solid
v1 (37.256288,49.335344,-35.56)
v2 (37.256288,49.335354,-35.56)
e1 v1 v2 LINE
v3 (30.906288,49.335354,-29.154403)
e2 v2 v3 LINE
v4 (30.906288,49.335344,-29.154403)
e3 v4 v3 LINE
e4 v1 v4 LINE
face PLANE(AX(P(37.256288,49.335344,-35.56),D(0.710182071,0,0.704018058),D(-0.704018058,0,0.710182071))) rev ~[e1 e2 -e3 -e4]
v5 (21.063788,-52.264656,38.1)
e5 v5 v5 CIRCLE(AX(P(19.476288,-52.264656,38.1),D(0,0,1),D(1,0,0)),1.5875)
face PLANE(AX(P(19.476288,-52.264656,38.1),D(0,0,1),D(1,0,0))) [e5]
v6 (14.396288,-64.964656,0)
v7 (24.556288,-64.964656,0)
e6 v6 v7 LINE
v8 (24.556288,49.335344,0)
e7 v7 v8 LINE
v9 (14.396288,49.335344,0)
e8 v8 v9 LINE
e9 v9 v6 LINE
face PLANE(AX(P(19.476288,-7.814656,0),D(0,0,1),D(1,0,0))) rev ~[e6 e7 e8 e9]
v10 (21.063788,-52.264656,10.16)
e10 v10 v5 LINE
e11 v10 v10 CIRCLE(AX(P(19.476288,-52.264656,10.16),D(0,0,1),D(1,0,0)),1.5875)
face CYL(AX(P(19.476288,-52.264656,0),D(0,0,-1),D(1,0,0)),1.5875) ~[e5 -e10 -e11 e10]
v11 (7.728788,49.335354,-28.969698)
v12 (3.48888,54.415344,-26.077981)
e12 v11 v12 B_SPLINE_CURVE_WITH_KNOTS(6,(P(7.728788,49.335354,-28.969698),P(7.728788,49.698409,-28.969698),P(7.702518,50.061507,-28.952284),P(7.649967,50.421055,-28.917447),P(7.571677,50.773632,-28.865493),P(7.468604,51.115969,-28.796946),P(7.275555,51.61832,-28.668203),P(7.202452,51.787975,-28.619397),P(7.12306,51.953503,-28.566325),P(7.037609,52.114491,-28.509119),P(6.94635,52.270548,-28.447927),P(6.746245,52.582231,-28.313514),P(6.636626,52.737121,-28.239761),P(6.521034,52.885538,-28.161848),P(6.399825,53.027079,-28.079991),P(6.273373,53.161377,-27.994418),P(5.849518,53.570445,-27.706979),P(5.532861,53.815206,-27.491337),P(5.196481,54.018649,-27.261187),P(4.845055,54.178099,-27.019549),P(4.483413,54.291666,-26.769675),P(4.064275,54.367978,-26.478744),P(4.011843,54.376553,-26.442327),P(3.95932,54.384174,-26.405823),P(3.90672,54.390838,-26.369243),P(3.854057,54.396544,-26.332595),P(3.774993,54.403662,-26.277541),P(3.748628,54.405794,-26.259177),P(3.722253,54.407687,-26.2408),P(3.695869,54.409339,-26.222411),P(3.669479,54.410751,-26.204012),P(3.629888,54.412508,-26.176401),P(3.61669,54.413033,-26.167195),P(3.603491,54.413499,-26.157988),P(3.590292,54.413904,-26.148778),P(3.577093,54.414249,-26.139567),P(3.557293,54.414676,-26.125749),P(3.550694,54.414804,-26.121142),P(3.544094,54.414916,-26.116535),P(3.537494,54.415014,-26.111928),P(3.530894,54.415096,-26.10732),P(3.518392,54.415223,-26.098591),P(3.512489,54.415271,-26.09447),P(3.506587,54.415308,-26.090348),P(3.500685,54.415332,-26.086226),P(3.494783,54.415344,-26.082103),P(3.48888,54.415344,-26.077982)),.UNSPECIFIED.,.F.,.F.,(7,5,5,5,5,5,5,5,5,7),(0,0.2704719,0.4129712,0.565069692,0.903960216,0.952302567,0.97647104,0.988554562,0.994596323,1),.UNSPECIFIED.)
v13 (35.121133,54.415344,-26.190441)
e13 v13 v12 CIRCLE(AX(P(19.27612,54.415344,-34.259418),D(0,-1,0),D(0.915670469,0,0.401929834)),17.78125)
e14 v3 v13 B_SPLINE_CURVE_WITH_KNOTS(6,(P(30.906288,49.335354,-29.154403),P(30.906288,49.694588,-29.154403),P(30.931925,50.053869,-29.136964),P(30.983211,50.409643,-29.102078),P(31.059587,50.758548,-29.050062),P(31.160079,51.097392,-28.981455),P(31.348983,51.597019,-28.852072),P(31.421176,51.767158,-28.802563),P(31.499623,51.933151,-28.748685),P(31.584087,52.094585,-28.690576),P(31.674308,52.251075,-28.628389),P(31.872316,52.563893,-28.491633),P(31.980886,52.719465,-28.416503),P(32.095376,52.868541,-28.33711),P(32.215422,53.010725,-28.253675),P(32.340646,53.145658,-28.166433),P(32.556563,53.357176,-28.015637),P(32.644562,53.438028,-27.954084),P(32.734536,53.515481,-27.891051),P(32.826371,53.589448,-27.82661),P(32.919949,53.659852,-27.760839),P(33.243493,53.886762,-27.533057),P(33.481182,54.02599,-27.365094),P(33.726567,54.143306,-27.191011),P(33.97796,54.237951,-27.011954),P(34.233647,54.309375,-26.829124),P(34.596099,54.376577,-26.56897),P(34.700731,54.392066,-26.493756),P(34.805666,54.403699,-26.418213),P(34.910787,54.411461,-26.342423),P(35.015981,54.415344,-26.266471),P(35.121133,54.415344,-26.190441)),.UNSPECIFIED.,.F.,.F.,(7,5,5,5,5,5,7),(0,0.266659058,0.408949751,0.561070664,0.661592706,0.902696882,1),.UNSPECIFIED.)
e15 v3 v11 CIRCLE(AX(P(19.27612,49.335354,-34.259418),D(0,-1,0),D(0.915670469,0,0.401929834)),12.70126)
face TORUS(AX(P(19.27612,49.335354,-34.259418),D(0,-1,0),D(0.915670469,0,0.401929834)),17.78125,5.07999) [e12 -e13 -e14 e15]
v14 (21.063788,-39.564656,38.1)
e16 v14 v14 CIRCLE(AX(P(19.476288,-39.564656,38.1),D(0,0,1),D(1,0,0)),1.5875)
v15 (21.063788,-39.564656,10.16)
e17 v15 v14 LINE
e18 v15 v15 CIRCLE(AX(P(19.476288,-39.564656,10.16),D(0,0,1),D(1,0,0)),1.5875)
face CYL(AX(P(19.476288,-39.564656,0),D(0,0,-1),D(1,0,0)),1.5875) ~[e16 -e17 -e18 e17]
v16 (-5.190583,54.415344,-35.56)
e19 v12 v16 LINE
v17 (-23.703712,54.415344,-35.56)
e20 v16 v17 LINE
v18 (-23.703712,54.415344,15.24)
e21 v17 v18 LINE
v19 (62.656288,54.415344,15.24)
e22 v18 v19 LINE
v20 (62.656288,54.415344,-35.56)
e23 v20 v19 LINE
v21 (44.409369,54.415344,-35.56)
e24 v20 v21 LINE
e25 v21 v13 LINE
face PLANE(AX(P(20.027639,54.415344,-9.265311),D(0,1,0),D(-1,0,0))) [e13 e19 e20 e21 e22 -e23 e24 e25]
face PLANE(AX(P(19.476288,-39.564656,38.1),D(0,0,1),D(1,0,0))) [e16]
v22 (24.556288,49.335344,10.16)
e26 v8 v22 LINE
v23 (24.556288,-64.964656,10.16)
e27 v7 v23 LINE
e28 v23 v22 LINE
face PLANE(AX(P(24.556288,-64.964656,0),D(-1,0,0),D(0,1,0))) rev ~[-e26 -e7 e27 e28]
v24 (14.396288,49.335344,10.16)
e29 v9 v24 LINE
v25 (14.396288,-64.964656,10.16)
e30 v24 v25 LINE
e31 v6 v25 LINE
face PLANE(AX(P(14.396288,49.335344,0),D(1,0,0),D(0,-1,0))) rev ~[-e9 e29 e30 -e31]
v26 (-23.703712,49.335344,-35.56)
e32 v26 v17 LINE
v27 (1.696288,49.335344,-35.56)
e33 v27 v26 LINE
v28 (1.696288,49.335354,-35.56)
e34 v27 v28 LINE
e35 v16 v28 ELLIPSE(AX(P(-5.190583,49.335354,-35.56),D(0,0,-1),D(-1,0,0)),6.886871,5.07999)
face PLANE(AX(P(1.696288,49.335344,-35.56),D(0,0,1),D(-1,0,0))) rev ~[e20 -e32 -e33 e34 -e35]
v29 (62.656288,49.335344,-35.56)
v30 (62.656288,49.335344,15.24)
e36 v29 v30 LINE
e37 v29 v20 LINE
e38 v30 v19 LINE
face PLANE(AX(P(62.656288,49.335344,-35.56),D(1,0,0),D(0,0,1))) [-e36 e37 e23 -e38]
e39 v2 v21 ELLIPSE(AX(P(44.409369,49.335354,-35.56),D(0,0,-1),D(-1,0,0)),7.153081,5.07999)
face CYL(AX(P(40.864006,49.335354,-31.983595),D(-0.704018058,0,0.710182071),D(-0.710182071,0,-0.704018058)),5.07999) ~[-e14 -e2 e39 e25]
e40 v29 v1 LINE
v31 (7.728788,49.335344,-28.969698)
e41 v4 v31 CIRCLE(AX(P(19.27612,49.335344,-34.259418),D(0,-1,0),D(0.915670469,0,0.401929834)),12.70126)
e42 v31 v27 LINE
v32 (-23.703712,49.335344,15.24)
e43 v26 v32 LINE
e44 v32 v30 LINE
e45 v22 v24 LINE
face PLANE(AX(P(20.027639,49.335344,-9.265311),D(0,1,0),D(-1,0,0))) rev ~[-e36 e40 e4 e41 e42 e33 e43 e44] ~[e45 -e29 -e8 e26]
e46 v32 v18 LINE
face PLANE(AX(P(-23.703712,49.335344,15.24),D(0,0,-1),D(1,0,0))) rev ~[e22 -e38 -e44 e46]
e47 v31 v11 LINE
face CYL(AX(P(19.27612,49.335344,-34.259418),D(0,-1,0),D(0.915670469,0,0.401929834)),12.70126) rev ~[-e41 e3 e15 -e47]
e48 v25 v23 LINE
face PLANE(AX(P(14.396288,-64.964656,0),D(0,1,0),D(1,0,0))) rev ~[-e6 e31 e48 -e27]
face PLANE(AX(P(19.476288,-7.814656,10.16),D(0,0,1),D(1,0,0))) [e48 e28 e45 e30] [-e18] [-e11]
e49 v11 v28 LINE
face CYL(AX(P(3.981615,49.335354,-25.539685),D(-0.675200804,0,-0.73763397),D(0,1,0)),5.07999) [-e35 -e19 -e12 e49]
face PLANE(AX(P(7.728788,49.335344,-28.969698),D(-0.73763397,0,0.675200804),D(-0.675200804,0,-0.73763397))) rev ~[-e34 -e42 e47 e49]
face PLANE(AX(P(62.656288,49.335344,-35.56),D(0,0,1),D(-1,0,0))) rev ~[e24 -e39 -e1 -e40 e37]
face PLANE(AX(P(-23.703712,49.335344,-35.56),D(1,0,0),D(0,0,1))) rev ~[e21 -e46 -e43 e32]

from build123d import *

# Parameters (mm, degrees)
F0_R     = 1.5875
F1_DEPTH = 10.16
F2_DEPTH = 38.1
F3_W     = 10.16
F3_H     = 10.16
F3_W_2   = 25.4
F3_H_2   = 50.8
F4_DEPTH = 5.08
F5_DEPTH = 3.81
F6_R     = 5.07999


# Not quite as in the source:
# - a fillet or chamfer is up to 0.001 mm smaller than in the source, because OpenCascade refuses the exact size
# - a feature names something its author has since deleted; it is built from what else it names


with BuildPart() as f1:
    # F0 (on Top) → F1 (new body)
    with BuildSketch(Plane.XY):
        Polygon((24.5562880617, 49.3353436351), (14.3962880617, 49.3353436351), (14.3962880617, -7.8146563649), (14.3962880617, -39.5646563649), (14.3962880617, -64.9646563649), (24.5562880617, -64.9646563649), align=None)
        with Locations((19.4762880617, -39.5646563649)):
            Circle(F0_R, mode=Mode.SUBTRACT)
        with Locations((19.4762880617, -52.2646563649)):
            Circle(F0_R, mode=Mode.SUBTRACT)
    extrude(amount=F1_DEPTH)

    # F0 (on Top) → F2 (join)
    with BuildSketch(Plane.XY):
        with Locations((19.4762880617, -39.5646563649)):
            Circle(F0_R)
        with Locations((19.4762880617, -52.2646563649)):
            Circle(F0_R)
    extrude(amount=F2_DEPTH)

    # F3 (on face) → F4 (join)
    with BuildSketch(Plane(origin=(0, 49.3353436351, 0), x_dir=(-1, 0, 0), z_dir=(0, 1, 0))):
        with BuildLine():
            Line((-24.5562880617, 0), (-24.5562880617, 10.16))
            Line((-24.5562880617, 10.16), (-24.5562880617, 15.24))
            Line((-24.5562880617, 15.24), (-37.2562880617, 15.24))
            Line((-37.2562880617, 15.24), (-37.2562880617, -35.56))
            Line((-37.2562880617, -35.56), (-30.9062880617, -29.15440273))
            ThreePointArc((-30.9062880617, -29.15440273), (-19.3773342754, -21.5585615124), (-7.7287880617, -28.9696984238))
            Line((-7.7287880617, -28.9696984238), (-1.6962880617, -35.56))
            Line((-1.6962880617, -35.56), (-1.6962880617, 10.16))
            Line((-1.6962880617, 10.16), (-14.3962880617, 10.16))
            Line((-14.3962880617, 10.16), (-14.3962880617, 0))
            Line((-14.3962880617, 0), (-24.5562880617, 0))
        make_face()
        Polygon((-24.5562880617, 15.24), (-24.5562880617, 10.16), (-14.3962880617, 10.16), (-1.6962880617, 10.16), (-1.6962880617, 15.24), (-13.7612880617, 15.24), align=None)
        with Locations((-19.4762880617, 5.08)):
            Rectangle(F3_W, F3_H)
        with Locations((-49.9562880617, -10.16)):
            Rectangle(F3_W_2, F3_H_2)
        Polygon((-1.6962880617, 15.24), (-1.6962880617, 10.16), (-1.6962880617, -35.56), (23.7037119383, -35.56), (23.7037119383, 15.24), align=None)
    extrude(amount=F4_DEPTH)

    # F3 (on face) → F5 (join)
    with BuildSketch(Plane(origin=(0, 49.3353436351, 0), x_dir=(-1, 0, 0), z_dir=(0, 1, 0))):
        with Locations((-19.4762880617, 5.08)):
            Rectangle(F3_W, F3_H)
    extrude(amount=F5_DEPTH)

    # F6 (radius 5.08 in the source; OpenCascade refuses exactly that, so slightly less here)
    f6_edges = [f1.edges().sort_by_distance(p)[0] for p in [
        (19.377334, 54.415344, -21.558562),
        (4.712538, 54.415344, -32.264849),
        (34.081288, 54.415344, -32.357201),
    ]]
    fillet(f6_edges, radius=F6_R)


solid = f1.part
